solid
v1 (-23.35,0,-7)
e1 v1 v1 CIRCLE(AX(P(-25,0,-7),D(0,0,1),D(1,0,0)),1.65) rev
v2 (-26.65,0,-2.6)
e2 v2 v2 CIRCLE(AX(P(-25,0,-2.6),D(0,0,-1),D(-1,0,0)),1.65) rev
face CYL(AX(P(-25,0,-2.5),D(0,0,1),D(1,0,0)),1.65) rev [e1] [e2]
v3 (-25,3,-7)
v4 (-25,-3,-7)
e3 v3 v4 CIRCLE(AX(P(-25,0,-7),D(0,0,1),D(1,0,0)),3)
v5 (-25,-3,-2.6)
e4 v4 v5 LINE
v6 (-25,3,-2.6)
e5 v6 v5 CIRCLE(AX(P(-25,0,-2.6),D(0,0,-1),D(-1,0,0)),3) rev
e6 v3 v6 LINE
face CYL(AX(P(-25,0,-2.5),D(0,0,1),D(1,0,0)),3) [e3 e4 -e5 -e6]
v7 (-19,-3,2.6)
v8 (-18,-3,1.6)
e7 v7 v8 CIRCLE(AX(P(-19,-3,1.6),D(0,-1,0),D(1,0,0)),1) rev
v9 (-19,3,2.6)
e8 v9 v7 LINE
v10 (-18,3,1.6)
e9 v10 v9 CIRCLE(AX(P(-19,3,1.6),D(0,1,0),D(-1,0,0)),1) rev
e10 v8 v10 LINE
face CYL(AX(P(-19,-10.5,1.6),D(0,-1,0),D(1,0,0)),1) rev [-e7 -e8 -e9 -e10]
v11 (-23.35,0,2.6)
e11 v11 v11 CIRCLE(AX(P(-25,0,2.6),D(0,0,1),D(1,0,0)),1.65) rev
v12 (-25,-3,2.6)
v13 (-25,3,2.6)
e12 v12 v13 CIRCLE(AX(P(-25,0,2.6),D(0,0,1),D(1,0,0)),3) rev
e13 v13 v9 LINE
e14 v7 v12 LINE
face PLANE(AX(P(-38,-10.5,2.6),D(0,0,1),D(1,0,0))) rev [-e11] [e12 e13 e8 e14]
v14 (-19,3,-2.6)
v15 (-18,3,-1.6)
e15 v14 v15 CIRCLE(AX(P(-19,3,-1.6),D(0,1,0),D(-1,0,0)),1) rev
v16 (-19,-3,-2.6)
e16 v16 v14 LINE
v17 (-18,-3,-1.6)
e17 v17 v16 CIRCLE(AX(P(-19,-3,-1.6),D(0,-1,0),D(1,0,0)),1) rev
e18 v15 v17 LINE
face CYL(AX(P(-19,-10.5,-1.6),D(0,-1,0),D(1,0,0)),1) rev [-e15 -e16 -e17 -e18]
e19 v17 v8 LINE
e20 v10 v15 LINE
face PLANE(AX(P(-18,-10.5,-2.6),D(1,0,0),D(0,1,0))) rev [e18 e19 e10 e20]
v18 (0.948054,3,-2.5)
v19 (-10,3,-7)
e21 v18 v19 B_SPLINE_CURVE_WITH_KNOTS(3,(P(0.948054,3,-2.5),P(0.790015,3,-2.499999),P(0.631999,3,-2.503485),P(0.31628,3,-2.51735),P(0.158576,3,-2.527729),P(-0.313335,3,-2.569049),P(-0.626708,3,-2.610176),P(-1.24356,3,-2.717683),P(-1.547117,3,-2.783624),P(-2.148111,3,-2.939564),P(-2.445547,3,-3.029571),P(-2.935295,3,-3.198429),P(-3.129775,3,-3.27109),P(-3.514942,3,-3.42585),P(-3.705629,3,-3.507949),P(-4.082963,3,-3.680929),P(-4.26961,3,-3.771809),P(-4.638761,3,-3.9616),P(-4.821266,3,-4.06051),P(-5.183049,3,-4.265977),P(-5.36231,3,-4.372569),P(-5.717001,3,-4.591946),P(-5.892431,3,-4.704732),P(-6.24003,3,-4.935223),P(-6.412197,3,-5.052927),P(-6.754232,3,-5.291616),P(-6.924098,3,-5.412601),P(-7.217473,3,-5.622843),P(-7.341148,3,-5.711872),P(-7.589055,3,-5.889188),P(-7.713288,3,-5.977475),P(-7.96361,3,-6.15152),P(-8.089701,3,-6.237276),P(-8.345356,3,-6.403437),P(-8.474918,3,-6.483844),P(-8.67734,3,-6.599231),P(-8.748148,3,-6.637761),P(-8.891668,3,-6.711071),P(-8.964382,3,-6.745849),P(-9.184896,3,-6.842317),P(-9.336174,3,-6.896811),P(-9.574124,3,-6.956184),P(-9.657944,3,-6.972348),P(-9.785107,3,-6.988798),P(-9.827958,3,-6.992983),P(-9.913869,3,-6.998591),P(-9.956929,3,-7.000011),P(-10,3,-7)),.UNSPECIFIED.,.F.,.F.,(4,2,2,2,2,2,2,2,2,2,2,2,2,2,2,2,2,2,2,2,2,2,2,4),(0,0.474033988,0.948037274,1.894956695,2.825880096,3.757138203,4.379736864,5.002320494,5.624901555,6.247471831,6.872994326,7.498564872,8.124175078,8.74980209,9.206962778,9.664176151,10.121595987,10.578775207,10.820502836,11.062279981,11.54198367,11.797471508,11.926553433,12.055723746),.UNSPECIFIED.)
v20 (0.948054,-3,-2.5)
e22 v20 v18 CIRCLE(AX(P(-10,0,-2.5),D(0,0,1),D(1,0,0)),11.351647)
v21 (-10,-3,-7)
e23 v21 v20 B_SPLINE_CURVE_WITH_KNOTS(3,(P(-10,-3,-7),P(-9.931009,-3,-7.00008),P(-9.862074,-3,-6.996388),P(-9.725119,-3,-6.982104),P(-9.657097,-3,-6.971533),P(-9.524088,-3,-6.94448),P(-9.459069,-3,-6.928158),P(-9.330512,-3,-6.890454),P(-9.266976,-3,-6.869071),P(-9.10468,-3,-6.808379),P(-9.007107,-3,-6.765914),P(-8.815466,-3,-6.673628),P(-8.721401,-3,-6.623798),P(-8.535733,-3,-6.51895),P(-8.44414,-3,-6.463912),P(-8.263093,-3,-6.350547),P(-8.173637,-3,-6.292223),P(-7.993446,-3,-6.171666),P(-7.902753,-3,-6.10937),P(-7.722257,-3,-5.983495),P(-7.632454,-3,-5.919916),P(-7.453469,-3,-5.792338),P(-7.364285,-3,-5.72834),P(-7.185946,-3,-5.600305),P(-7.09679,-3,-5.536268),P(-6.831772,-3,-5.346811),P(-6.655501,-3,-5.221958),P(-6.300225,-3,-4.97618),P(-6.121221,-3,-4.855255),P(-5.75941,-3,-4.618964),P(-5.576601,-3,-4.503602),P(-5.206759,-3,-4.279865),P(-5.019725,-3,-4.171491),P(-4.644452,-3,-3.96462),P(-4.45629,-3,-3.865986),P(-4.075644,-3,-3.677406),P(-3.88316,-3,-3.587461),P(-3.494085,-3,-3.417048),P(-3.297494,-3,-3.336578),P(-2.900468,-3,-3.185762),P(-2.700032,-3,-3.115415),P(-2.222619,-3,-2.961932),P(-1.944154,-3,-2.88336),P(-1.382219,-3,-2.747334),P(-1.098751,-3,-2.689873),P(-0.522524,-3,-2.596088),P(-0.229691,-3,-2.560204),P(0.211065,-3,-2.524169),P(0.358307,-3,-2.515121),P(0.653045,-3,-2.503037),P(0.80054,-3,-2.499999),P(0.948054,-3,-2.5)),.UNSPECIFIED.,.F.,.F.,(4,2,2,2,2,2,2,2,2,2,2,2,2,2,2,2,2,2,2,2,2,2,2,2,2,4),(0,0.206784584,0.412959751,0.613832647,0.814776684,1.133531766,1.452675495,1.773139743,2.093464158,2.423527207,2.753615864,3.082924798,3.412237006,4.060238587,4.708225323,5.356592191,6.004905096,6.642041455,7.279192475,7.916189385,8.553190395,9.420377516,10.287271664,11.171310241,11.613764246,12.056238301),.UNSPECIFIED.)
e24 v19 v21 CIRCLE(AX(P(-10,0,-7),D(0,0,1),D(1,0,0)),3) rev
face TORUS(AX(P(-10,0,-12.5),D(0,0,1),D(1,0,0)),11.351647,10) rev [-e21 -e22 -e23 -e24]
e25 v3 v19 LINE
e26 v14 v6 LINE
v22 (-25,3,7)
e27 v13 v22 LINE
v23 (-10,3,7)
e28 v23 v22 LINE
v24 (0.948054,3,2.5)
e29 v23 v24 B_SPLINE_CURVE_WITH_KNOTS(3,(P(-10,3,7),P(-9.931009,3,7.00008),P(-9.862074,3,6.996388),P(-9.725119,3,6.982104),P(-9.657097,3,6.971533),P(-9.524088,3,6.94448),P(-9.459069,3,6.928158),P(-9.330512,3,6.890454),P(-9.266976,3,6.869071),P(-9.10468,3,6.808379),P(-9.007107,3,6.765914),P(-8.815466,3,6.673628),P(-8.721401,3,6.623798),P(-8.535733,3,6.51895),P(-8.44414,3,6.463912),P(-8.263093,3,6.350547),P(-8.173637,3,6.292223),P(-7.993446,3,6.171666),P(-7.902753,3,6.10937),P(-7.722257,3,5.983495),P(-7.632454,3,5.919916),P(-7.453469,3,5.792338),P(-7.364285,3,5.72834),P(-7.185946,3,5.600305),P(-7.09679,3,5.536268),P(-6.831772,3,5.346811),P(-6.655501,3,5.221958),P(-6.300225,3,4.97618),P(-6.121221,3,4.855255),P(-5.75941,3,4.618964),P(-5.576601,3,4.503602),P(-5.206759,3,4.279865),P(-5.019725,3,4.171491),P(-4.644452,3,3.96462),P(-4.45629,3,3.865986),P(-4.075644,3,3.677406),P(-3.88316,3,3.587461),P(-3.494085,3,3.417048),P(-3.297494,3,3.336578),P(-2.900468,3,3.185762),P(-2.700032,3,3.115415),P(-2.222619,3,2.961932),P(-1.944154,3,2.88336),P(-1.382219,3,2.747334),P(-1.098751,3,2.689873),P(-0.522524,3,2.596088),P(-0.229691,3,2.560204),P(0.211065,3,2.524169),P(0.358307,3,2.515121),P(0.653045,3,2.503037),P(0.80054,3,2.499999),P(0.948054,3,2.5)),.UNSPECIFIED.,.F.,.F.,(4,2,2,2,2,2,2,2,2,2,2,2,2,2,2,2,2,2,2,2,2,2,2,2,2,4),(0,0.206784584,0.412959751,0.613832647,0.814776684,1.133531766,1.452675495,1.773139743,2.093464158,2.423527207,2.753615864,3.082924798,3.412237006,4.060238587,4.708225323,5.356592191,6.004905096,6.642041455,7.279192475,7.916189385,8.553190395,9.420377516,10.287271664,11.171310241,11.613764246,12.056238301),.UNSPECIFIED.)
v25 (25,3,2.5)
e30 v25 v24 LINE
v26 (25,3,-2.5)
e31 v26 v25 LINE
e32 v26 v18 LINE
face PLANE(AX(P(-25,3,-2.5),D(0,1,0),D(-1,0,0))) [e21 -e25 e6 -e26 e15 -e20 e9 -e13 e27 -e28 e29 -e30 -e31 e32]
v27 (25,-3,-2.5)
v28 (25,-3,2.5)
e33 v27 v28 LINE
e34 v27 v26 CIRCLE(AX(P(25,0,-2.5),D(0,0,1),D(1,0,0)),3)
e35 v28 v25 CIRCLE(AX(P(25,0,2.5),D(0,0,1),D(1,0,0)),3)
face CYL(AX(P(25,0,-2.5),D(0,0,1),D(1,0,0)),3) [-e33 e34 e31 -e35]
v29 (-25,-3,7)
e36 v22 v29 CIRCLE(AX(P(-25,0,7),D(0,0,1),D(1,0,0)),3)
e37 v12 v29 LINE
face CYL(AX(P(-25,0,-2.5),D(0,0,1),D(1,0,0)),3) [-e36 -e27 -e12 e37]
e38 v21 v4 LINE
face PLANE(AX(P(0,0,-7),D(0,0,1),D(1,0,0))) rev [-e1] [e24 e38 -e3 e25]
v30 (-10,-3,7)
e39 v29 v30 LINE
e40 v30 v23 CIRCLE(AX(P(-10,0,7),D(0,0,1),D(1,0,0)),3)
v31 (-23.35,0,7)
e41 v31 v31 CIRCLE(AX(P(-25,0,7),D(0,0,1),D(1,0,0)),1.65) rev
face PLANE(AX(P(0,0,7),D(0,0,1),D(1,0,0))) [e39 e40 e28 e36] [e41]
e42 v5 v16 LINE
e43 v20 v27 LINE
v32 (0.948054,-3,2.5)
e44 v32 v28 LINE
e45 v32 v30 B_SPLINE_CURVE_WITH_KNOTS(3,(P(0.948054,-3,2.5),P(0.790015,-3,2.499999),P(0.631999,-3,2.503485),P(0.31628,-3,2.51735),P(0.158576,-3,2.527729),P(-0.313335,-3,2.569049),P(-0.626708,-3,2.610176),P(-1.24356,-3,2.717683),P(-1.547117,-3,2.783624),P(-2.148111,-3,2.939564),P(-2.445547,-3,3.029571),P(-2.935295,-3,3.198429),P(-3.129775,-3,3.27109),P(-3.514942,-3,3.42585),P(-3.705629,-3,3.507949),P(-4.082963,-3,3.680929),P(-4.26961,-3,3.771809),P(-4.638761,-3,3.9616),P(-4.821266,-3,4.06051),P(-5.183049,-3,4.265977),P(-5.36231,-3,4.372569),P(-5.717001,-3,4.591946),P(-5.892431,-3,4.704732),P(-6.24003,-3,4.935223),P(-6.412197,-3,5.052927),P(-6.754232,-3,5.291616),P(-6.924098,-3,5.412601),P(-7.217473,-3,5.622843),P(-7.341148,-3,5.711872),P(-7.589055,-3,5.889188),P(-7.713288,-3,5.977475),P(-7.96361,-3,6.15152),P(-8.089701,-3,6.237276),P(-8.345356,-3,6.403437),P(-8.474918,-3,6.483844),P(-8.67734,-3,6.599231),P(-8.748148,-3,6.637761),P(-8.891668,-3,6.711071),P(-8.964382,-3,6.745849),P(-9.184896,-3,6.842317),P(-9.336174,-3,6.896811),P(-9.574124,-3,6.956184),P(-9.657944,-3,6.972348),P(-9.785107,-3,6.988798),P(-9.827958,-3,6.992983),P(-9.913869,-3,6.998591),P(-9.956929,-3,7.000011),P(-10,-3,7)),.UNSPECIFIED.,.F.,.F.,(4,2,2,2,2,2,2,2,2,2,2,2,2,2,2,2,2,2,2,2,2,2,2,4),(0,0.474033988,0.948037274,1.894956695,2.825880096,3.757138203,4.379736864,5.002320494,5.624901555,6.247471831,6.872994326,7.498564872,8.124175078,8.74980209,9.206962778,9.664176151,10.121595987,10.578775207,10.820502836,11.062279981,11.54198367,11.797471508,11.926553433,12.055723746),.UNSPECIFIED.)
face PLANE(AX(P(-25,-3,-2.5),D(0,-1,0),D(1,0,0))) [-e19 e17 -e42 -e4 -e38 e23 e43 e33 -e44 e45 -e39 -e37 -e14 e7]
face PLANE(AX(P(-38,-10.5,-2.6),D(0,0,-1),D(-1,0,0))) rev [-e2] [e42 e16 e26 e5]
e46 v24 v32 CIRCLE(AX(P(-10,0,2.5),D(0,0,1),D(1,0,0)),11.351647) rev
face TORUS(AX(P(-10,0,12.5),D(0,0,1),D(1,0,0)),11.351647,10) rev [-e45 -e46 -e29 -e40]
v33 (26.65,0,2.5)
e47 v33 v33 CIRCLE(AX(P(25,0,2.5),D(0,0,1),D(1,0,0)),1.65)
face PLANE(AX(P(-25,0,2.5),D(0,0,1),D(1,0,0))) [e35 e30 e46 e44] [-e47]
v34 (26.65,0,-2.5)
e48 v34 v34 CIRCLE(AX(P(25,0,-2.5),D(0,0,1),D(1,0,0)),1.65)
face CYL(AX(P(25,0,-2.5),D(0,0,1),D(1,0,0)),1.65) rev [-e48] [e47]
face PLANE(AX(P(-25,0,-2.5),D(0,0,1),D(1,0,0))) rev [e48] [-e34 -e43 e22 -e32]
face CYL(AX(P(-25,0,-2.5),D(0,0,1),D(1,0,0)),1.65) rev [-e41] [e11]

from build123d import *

# Parameters (mm, degrees)
EXTRUDE_1_DEPTH      = 2.5
EXTRUDE_1_DEPTH_BACK = 2.5
SKETCH_1_R           = 1.65
EXTRUDE_2_DEPTH      = 4.5
EXTRUDE_2_DEPTH_BACK = 9.5
SKETCH_2_R           = 1.65
EXTRUDE_3_REACH      = 33.448
SKETCH_4_W           = 20
SKETCH_4_H           = 5.2
CUT_EXTRUDE_1_DEPTH  = 13.5
FILLET_1_R           = 10
FILLET_2_R           = 1


with BuildPart() as part:
    # 草图1 → 凸台-拉伸1 (new, two sides: drawn at the far end of the back side and taken through both)
    with BuildSketch(Plane.XY.offset(-EXTRUDE_1_DEPTH_BACK)):
        with BuildLine():
            Line((-25, 3), (25, 3))
            ThreePointArc((25, 3), (28, 0), (25, -3))
            Line((25, -3), (-25, -3))
            ThreePointArc((-25, -3), (-28, 0), (-25, 3))
        make_face()
        with Locations((-25, 0)):
            Circle(SKETCH_1_R, mode=Mode.SUBTRACT)
        with Locations((25, 0)):
            Circle(SKETCH_1_R, mode=Mode.SUBTRACT)
    extrude(amount=EXTRUDE_1_DEPTH + EXTRUDE_1_DEPTH_BACK)

    # 草图2 → 凸台-拉伸2 (add, two sides: drawn at the far end of the back side and taken through both)
    with BuildSketch(Plane.XY.offset(2.5).offset(-EXTRUDE_2_DEPTH_BACK)):
        with BuildLine():
            ThreePointArc((-25, -3), (-22.878679656, -2.121320344), (-22, 0))
            ThreePointArc((-22, 0), (-22.878679656, 2.121320344), (-25, 3))
            ThreePointArc((-25, 3), (-28, 0), (-25, -3))
        make_face()
        with Locations((-25, 0)):
            Circle(SKETCH_2_R, mode=Mode.SUBTRACT)
    extrude(amount=EXTRUDE_2_DEPTH + EXTRUDE_2_DEPTH_BACK)

    # 凸台-拉伸3: up to this face of the body (flat: up to its plane)
    extrude_3_end = Plane(part.part.faces().sort_by_distance((-25, 2.915147186, -7))[0])
    # 草图3 → 凸台-拉伸3 (add, up to the picked face)
    with BuildSketch(Plane.XY.offset(7), mode=Mode.PRIVATE) as extrude_3_sk1:
        with BuildLine():
            Line((-25, -3), (-10, -3))
            ThreePointArc((-10, -3), (-7, 0), (-10, 3))
            Line((-10, 3), (-25, 3))
            ThreePointArc((-25, 3), (-22, 0), (-25, -3))
        make_face()
    extrude_3_tool1 = split(extrude(extrude_3_sk1.sketch, amount=-EXTRUDE_3_REACH, mode=Mode.PRIVATE), bisect_by=extrude_3_end, keep=Keep.BOTH, mode=Mode.PRIVATE)
    add(extrude_3_tool1.solids().sort_by(Axis((-15.143806, 0, 7), (0, 0, -1)))[0])

    # 草图4 → 切除-拉伸1 (cut)
    with BuildSketch(Plane(origin=(0, 3, 0), x_dir=(1, 0, 0), z_dir=(0, 1, 0))):
        with Locations((-28, 0)):
            Rectangle(SKETCH_4_W, SKETCH_4_H)
    extrude(amount=-CUT_EXTRUDE_1_DEPTH, mode=Mode.SUBTRACT)

    # 圆角1
    # the kernel refuses this fillet: 10 mm, written as the material it adds along each edge
    with BuildSketch(Plane(origin=(-10, 0, -2.5), x_dir=(-0.9999950652018582, -0.0031415874858792066, 0), z_dir=(-0.0031415874858792066, 0.9999950652018582, 0))) as fillet_1_piece_1_section:
        with BuildLine():
            CenterArc((11.351646544, -10), FILLET_1_R, 90, 56.632987031)
            Line((11.351646544, 0), (3, 0))
            Line((3, 0), (3, -4.5))
        make_face()
    fillet_1_piece_1 = revolve(axis=Axis((-10, 0, -2.5), (0, 0, 1)), revolution_arc=359.64, mode=Mode.PRIVATE)
    fillet_1_piece_1 = split(fillet_1_piece_1, bisect_by=Plane(origin=(-4.0130996, 3, -4.037145942), z_dir=(0, -1, 0)), keep=Keep.TOP, mode=Mode.PRIVATE)
    fillet_1_piece_1 = split(fillet_1_piece_1, bisect_by=Plane(origin=(-18, 1e-09, -4.037145942), z_dir=(1, 0, 0)), keep=Keep.TOP, mode=Mode.PRIVATE)
    fillet_1_piece_1 = split(fillet_1_piece_1, bisect_by=Plane(origin=(-4.0130996, -3, -4.037145942), z_dir=(0, 1, 0)), keep=Keep.TOP, mode=Mode.PRIVATE)
    add(fillet_1_piece_1)
    with BuildSketch(Plane(origin=(-10, 0, 2.5), x_dir=(-0.9999950652018582, -0.0031415874858792066, 0), z_dir=(-0.0031415874858792066, 0.9999950652018582, 0))) as fillet_1_piece_2_section:
        with BuildLine():
            CenterArc((11.351646544, 10), FILLET_1_R, 213.367012969, 56.632987031)
            Line((3, 4.5), (3, 0))
            Line((3, 0), (11.351646544, 0))
        make_face()
    fillet_1_piece_2 = revolve(axis=Axis((-10, 0, 2.5), (0, 0, 1)), revolution_arc=359.64, mode=Mode.PRIVATE)
    fillet_1_piece_2 = split(fillet_1_piece_2, bisect_by=Plane(origin=(0.64312555, 3, 2.505081391), z_dir=(0, -1, 0)), keep=Keep.TOP, mode=Mode.PRIVATE)
    fillet_1_piece_2 = split(fillet_1_piece_2, bisect_by=Plane(origin=(-18, 0, 2.505081391), z_dir=(1, 0, 0)), keep=Keep.TOP, mode=Mode.PRIVATE)
    fillet_1_piece_2 = split(fillet_1_piece_2, bisect_by=Plane(origin=(0.64312555, -3, 2.505081391), z_dir=(0, 1, 0)), keep=Keep.TOP, mode=Mode.PRIVATE)
    add(fillet_1_piece_2)

    # 圆角2
    fillet_2_edges = [part.edges().sort_by_distance(p)[0] for p in [
        (-18, 0, 2.6),
        (-18, 0, -2.6),
    ]]
    fillet(fillet_2_edges, radius=FILLET_2_R)


solid = part.part
